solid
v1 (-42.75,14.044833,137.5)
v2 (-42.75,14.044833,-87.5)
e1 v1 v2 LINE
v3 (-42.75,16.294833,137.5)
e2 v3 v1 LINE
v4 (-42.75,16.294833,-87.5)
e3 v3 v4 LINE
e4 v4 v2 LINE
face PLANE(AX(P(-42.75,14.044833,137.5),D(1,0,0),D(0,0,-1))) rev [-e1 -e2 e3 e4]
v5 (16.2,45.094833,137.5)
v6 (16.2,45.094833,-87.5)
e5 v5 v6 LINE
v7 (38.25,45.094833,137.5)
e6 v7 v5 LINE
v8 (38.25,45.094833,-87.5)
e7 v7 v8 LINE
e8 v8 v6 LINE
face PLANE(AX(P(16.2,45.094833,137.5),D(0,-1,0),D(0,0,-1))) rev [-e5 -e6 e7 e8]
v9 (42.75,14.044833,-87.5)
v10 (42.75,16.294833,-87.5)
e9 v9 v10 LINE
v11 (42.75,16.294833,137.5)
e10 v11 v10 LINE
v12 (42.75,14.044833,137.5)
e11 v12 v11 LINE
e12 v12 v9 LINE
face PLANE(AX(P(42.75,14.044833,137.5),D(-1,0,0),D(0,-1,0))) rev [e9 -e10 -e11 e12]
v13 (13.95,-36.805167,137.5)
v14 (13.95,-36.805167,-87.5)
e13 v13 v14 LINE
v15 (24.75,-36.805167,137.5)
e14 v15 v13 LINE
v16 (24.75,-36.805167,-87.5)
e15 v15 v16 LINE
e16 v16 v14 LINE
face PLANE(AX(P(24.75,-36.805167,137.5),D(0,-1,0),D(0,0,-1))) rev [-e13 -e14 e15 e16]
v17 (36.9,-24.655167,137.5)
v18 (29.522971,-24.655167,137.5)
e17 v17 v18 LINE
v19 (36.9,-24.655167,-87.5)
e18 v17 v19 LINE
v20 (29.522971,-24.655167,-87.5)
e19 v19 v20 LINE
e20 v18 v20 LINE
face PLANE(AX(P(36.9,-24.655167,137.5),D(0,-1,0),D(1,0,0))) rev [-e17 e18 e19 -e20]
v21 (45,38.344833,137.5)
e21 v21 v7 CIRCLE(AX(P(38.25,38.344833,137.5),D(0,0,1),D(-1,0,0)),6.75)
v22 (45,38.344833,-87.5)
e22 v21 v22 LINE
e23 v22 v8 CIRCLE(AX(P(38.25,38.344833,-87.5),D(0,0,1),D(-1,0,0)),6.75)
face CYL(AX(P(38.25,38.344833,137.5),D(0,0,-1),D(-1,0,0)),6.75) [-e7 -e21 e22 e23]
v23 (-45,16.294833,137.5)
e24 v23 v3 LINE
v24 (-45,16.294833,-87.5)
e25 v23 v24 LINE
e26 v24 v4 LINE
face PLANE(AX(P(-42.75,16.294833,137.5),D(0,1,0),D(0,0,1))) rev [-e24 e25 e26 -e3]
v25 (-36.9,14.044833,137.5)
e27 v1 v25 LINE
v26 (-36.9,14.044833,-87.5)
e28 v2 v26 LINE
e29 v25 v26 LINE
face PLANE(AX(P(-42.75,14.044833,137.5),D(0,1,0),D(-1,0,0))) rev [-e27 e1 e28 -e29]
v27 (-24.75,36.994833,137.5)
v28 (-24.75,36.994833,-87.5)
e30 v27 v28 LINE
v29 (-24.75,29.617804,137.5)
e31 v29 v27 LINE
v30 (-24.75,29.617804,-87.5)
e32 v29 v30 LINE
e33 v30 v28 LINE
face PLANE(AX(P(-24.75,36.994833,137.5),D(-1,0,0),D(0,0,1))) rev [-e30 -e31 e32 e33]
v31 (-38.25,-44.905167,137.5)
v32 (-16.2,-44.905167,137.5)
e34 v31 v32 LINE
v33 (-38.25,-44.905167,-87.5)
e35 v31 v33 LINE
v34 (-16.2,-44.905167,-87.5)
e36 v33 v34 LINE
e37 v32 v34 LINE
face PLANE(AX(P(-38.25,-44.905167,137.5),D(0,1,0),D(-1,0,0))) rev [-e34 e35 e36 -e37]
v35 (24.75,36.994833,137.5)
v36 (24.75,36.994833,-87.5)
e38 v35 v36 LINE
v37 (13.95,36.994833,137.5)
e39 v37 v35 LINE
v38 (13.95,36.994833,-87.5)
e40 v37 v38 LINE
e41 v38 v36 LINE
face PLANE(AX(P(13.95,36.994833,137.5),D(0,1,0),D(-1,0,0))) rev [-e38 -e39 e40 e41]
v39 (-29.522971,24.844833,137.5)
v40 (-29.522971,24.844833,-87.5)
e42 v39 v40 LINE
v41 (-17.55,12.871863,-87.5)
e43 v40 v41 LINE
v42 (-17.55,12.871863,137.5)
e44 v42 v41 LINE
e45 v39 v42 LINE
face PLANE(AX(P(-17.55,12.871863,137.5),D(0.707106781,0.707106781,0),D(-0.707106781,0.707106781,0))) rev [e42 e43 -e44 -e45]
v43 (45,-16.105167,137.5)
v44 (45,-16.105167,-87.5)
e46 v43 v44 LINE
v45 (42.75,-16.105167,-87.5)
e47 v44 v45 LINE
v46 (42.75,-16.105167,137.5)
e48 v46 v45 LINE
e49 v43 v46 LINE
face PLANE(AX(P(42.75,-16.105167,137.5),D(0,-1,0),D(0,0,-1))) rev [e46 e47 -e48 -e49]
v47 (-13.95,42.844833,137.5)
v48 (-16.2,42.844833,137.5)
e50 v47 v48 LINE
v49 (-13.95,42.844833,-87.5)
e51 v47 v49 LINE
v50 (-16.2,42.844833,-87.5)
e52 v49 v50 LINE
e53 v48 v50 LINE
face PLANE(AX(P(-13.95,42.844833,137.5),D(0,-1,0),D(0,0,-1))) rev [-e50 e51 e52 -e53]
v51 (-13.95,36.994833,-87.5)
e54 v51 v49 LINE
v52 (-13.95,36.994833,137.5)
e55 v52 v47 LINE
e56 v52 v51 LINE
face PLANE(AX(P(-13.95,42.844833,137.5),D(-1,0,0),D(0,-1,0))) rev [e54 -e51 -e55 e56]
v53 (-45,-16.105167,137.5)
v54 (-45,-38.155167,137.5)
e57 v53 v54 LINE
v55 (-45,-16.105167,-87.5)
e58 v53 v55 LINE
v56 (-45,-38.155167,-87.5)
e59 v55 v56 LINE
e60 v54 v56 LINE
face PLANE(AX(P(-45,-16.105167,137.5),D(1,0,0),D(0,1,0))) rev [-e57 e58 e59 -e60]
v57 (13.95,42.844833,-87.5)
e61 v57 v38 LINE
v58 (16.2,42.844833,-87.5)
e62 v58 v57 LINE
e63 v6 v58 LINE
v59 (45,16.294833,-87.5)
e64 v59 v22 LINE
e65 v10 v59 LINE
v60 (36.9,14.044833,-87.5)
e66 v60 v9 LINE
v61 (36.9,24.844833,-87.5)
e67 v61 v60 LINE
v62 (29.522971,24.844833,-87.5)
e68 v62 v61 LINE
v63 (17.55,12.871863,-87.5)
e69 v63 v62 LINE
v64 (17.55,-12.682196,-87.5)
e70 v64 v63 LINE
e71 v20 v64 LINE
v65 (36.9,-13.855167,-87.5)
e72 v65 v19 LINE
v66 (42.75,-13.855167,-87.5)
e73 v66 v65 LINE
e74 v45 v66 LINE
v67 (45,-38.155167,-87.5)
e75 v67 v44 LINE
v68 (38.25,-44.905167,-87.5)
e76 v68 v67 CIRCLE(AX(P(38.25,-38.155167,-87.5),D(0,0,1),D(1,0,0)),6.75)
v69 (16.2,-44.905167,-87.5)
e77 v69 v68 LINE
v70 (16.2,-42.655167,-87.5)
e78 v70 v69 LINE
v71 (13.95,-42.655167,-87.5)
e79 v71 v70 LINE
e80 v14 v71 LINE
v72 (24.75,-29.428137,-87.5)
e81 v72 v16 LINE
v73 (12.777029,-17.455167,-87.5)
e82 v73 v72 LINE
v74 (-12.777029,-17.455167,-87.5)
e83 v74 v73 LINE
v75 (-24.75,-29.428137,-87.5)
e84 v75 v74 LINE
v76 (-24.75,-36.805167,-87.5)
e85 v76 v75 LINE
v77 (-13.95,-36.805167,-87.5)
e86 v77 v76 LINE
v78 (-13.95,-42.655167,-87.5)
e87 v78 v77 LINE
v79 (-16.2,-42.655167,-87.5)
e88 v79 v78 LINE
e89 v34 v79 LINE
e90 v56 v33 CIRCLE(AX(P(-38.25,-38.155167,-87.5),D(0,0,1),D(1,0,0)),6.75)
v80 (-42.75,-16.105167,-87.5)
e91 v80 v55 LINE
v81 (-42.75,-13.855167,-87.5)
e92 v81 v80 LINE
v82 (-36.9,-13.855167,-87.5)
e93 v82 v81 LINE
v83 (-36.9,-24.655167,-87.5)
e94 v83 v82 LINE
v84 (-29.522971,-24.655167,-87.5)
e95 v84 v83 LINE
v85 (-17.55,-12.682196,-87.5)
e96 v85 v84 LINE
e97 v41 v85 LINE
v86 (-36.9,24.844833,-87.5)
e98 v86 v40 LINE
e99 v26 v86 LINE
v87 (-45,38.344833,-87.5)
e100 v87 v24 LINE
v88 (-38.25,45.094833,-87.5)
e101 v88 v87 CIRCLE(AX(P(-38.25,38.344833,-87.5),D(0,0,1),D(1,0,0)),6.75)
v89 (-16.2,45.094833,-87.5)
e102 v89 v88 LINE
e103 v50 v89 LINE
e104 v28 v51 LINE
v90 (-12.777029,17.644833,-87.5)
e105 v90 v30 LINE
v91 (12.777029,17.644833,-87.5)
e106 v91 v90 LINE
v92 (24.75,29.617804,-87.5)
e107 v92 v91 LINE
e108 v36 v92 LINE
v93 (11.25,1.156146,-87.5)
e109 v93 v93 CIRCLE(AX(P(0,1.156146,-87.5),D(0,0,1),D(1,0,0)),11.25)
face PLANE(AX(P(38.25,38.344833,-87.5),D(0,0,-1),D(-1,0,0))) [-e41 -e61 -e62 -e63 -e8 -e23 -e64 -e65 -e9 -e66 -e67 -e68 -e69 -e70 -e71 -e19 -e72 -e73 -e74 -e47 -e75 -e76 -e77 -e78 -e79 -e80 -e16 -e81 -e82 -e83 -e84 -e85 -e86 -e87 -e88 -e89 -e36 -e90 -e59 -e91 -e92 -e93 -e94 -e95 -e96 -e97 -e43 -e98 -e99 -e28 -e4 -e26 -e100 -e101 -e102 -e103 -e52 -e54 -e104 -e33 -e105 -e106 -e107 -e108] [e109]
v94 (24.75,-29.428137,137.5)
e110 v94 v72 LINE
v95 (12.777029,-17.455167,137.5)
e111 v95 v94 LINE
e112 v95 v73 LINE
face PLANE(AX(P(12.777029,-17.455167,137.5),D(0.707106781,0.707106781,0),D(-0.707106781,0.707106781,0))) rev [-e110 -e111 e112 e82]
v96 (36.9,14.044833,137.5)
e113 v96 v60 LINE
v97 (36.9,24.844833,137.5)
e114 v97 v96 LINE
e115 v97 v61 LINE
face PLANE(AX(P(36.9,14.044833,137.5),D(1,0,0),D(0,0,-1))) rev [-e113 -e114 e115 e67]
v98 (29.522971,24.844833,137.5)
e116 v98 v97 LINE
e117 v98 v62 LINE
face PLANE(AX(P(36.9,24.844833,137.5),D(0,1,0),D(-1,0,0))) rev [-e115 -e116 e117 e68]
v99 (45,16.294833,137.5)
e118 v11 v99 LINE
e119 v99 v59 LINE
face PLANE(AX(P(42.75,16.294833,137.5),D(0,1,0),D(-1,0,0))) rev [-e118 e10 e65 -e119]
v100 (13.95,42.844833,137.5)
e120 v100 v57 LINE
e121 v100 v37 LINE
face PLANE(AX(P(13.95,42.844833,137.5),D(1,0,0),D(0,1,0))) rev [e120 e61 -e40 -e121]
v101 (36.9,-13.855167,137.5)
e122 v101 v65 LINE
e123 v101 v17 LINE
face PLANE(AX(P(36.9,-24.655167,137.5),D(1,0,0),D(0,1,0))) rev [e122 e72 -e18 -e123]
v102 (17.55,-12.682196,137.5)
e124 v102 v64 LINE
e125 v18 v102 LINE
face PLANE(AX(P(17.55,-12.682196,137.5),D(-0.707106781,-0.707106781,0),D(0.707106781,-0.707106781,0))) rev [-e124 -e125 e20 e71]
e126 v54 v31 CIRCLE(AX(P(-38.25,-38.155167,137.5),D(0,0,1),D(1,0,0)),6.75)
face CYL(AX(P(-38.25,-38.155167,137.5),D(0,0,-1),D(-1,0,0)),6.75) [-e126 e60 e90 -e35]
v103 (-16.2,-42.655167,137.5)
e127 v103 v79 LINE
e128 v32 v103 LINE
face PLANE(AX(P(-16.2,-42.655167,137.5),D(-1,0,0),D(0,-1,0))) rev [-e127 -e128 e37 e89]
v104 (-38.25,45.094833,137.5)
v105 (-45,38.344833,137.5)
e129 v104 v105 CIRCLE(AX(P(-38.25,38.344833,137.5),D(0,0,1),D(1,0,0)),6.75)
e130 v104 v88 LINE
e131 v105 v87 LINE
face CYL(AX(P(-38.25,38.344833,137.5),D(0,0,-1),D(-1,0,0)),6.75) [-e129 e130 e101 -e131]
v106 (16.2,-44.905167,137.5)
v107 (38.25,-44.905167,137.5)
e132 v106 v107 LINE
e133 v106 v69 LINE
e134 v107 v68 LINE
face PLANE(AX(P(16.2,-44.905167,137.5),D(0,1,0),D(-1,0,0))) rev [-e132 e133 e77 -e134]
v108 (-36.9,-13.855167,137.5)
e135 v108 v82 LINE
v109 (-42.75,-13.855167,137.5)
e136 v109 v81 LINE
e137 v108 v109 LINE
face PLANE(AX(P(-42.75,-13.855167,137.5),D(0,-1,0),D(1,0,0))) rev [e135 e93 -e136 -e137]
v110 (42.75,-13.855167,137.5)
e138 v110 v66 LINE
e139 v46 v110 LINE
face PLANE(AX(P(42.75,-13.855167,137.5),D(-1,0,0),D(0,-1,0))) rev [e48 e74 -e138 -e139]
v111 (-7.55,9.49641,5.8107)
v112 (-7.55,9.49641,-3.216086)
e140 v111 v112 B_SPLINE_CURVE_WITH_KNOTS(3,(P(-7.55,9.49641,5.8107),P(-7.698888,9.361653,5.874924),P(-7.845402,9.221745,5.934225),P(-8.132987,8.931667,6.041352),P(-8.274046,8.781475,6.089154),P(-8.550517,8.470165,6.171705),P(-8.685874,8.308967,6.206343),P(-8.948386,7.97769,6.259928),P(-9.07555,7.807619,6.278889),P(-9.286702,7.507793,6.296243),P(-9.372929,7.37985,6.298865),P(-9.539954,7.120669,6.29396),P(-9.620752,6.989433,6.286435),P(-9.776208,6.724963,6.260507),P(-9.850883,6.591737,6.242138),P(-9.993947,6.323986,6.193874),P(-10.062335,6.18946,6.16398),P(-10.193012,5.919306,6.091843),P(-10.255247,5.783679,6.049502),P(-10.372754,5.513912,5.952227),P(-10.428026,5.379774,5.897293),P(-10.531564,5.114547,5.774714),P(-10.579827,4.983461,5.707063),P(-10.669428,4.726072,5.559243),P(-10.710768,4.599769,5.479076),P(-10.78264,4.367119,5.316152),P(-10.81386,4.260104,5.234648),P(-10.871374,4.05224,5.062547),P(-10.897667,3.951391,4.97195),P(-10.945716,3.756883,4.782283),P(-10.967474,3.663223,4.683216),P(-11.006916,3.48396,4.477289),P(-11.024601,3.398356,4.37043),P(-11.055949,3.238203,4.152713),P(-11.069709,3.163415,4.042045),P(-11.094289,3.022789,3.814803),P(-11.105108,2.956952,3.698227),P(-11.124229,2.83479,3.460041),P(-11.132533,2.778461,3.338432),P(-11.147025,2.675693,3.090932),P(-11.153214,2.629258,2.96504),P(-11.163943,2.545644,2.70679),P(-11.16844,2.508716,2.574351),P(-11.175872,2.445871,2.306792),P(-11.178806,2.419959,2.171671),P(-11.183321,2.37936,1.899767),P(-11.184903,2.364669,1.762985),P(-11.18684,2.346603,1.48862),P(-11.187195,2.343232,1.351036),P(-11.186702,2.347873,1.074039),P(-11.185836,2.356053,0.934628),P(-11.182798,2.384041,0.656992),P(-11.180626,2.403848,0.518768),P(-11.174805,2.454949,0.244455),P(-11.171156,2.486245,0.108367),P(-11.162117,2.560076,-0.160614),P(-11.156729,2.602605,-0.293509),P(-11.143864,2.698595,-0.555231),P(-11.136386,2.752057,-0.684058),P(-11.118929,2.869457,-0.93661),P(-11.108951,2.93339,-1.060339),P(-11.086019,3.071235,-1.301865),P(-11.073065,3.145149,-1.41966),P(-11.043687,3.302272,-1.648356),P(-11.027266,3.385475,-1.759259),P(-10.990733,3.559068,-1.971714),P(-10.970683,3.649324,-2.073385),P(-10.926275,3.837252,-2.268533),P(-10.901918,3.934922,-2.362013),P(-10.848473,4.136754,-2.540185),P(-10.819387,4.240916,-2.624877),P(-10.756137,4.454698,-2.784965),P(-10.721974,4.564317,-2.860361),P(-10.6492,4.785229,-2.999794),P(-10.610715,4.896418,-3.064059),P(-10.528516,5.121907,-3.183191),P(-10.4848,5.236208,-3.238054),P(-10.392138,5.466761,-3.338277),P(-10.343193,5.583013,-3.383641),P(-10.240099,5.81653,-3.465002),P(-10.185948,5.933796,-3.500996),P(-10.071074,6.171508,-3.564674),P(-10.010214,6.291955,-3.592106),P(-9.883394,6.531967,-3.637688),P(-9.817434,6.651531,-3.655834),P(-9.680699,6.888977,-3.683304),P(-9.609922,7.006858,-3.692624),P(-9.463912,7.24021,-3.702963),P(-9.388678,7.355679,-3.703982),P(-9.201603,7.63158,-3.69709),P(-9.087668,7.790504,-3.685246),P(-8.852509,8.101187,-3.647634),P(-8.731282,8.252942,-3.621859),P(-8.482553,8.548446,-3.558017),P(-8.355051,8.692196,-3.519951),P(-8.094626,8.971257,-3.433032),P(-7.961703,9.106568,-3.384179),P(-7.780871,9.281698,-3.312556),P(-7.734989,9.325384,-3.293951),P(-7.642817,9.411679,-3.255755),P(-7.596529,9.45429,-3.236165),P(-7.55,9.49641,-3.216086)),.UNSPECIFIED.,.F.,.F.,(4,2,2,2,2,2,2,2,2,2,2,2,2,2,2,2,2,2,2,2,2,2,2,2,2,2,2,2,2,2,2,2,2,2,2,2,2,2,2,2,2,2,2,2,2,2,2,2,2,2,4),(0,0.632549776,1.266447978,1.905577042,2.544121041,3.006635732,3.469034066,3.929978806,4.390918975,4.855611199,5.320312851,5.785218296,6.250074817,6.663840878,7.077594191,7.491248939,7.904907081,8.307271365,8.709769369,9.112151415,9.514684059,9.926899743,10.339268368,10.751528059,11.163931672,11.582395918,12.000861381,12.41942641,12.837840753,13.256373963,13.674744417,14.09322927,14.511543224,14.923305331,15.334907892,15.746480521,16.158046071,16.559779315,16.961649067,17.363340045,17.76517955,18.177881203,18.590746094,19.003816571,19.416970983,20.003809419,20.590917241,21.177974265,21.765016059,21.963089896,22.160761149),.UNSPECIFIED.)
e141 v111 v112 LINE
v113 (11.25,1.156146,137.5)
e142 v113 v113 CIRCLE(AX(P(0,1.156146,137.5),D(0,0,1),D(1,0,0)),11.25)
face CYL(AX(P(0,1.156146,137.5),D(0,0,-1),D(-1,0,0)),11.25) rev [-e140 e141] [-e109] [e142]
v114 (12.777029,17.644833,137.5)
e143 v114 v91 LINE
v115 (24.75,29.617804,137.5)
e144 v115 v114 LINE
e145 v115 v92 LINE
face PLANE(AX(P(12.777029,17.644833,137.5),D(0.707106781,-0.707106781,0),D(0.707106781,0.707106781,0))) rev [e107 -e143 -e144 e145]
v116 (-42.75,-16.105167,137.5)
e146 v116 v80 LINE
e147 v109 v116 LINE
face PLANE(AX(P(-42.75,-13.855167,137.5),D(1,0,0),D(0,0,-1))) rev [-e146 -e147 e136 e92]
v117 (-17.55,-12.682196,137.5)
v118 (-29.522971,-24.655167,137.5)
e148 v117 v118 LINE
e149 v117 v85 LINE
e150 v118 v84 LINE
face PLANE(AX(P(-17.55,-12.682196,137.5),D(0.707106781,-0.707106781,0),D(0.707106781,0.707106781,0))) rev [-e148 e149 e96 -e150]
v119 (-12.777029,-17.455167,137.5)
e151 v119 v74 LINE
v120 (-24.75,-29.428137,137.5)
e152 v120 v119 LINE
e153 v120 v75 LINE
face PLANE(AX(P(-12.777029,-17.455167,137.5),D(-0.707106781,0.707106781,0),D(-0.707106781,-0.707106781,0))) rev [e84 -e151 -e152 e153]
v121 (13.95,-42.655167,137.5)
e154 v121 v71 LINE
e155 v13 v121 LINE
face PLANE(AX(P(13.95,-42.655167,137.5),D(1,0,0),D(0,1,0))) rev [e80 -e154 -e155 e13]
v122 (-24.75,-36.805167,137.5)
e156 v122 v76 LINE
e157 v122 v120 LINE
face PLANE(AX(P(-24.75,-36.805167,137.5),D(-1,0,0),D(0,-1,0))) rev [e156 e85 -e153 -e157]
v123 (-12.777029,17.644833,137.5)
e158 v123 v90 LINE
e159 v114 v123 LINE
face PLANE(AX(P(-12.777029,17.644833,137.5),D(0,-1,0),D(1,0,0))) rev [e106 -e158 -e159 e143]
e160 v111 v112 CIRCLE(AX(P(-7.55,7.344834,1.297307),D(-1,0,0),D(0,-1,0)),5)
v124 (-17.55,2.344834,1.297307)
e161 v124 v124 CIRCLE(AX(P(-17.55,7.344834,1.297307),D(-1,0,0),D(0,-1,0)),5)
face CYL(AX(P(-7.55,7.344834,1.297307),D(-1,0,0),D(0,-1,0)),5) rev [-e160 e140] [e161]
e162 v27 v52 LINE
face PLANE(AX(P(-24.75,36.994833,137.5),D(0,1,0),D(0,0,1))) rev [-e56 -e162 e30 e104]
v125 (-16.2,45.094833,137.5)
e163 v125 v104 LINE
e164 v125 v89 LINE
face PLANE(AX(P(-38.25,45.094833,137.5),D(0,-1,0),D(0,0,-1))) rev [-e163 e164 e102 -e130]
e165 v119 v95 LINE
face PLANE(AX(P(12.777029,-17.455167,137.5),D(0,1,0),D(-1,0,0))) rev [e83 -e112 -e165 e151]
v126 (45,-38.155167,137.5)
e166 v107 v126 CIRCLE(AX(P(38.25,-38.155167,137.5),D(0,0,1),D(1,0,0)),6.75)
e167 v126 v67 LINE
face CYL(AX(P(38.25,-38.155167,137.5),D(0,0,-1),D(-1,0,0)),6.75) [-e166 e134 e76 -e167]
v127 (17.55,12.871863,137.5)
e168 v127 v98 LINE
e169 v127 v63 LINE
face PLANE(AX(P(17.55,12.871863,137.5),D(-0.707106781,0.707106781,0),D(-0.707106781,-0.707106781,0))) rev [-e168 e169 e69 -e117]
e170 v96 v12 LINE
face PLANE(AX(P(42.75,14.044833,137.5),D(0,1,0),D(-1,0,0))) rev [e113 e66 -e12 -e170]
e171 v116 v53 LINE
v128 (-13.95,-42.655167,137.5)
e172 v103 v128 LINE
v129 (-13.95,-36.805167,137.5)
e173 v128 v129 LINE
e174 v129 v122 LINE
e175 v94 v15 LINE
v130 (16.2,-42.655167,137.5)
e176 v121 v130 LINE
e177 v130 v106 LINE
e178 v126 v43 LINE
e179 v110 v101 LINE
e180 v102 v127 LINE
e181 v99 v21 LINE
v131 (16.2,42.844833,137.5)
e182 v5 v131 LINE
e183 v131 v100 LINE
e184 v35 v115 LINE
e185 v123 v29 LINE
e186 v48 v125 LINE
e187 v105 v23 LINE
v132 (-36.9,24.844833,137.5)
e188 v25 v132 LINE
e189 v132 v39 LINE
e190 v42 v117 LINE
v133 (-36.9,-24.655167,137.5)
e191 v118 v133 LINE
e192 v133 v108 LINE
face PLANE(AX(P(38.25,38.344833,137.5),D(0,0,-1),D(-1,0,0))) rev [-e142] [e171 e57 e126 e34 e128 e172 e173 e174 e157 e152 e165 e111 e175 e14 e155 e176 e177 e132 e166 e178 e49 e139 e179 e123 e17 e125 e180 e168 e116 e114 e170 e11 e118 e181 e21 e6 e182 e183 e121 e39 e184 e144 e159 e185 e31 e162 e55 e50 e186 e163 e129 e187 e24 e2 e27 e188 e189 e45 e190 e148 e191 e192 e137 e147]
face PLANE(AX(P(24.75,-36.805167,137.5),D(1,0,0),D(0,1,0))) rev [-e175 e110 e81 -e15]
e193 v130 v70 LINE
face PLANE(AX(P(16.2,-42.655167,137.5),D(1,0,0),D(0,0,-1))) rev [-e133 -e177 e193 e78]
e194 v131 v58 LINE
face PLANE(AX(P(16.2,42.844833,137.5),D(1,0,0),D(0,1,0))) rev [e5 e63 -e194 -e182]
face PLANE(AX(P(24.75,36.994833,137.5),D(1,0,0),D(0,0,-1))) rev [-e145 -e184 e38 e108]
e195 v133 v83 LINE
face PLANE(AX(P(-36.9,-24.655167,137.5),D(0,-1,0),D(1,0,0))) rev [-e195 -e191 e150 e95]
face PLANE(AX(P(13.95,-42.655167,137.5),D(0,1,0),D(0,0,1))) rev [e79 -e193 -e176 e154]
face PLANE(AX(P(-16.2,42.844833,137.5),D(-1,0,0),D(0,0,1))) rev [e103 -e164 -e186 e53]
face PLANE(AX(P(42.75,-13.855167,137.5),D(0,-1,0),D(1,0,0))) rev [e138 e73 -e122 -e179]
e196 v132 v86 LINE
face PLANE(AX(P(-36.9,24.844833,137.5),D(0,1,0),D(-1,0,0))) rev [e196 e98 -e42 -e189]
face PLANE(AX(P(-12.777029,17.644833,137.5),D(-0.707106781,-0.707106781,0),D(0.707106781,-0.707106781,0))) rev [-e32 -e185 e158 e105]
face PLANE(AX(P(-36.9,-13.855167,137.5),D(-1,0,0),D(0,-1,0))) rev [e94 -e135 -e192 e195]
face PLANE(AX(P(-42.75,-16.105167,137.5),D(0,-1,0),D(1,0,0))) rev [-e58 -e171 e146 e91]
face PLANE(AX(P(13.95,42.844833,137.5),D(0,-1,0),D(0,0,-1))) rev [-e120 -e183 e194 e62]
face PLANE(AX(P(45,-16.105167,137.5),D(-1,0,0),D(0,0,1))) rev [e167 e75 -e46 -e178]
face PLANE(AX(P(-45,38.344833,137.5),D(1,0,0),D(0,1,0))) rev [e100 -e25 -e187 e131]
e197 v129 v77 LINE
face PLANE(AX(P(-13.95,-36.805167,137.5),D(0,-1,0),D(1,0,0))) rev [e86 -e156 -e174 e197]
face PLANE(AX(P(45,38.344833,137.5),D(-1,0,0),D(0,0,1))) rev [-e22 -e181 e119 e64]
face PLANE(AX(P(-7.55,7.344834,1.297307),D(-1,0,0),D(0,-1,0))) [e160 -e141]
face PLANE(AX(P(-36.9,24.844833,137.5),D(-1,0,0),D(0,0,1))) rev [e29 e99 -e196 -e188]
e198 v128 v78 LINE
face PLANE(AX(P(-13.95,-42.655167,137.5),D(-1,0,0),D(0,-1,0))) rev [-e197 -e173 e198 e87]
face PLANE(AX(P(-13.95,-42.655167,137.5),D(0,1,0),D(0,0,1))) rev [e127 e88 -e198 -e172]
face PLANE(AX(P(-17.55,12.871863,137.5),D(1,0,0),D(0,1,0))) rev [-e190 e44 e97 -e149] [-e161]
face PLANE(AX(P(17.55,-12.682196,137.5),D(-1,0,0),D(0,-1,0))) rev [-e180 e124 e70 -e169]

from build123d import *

# Parameters (mm, degrees)
SKETCH1_R           = 2.5
BOSS_EXTRUDE1_DEPTH = 50
SCALE_2_SCALE       = 3
SCALE_3_SCALE       = 6
SCALE_5_SCALE       = 2
SCALE_6_SCALE       = 0.25
SCALE_7_SCALE       = 0.125
SCALE_8_SCALE       = 0.25
SCALE_9_SCALE       = 4
SCALE_10_SCALE      = 4
OTHER_START         = -17.55
OTHER_1_OUTLINE_R   = 5
OTHER_1_DEPTH       = 10


# Read off the part's stored shape, not the designer's step: 孔1
with BuildPart() as part:
    # Sketch1 → Boss-Extrude1 (new body)
    with BuildSketch(Plane.XY):
        with BuildLine():
            Line((2.839339828, 3.9), (5.5, 6.560660172))
            Line((5.5, 6.560660172), (5.5, 8.2))
            Line((5.5, 8.2), (3.1, 8.2))
            Line((3.1, 8.2), (3.1, 9.5))
            Line((3.1, 9.5), (3.6, 9.5))
            Line((3.6, 9.5), (3.6, 10))
            Line((3.6, 10), (8.5, 10))
            ThreePointArc((8.5, 10), (9.560660172, 9.560660172), (10, 8.5))
            Line((10, 8.5), (10, 3.6))
            Line((10, 3.6), (9.5, 3.6))
            Line((9.5, 3.6), (9.5, 3.1))
            Line((9.5, 3.1), (8.2, 3.1))
            Line((8.2, 3.1), (8.2, 5.5))
            Line((8.2, 5.5), (6.560660172, 5.5))
            Line((6.560660172, 5.5), (3.9, 2.839339828))
            Line((3.9, 2.839339828), (3.9, -2.839339828))
            Line((3.9, -2.839339828), (6.560660172, -5.5))
            Line((6.560660172, -5.5), (8.2, -5.5))
            Line((8.2, -5.5), (8.2, -3.1))
            Line((8.2, -3.1), (9.5, -3.1))
            Line((9.5, -3.1), (9.5, -3.6))
            Line((9.5, -3.6), (10, -3.6))
            Line((10, -3.6), (10, -8.5))
            ThreePointArc((10, -8.5), (9.560660172, -9.560660172), (8.5, -10))
            Line((8.5, -10), (3.6, -10))
            Line((3.6, -10), (3.6, -9.5))
            Line((3.6, -9.5), (3.1, -9.5))
            Line((3.1, -9.5), (3.1, -8.2))
            Line((3.1, -8.2), (5.5, -8.2))
            Line((5.5, -8.2), (5.5, -6.560660172))
            Line((5.5, -6.560660172), (2.839339828, -3.9))
            Line((2.839339828, -3.9), (-2.839339828, -3.9))
            Line((-2.839339828, -3.9), (-5.5, -6.560660172))
            Line((-5.5, -6.560660172), (-5.5, -8.2))
            Line((-5.5, -8.2), (-3.1, -8.2))
            Line((-3.1, -8.2), (-3.1, -9.5))
            Line((-3.1, -9.5), (-3.6, -9.5))
            Line((-3.6, -9.5), (-3.6, -10))
            Line((-3.6, -10), (-8.5, -10))
            ThreePointArc((-8.5, -10), (-9.560660172, -9.560660172), (-10, -8.5))
            Line((-10, -8.5), (-10, -3.6))
            Line((-10, -3.6), (-9.5, -3.6))
            Line((-9.5, -3.6), (-9.5, -3.1))
            Line((-9.5, -3.1), (-8.2, -3.1))
            Line((-8.2, -3.1), (-8.2, -5.5))
            Line((-8.2, -5.5), (-6.560660172, -5.5))
            Line((-6.560660172, -5.5), (-3.9, -2.839339828))
            Line((-3.9, -2.839339828), (-3.9, 2.839339828))
            Line((-3.9, 2.839339828), (-6.560660172, 5.5))
            Line((-6.560660172, 5.5), (-8.2, 5.5))
            Line((-8.2, 5.5), (-8.2, 3.1))
            Line((-8.2, 3.1), (-9.5, 3.1))
            Line((-9.5, 3.1), (-9.5, 3.6))
            Line((-9.5, 3.6), (-10, 3.6))
            Line((-10, 3.6), (-10, 8.5))
            ThreePointArc((-10, 8.5), (-9.560660172, 9.560660172), (-8.5, 10))
            Line((-8.5, 10), (-3.6, 10))
            Line((-3.6, 10), (-3.6, 9.5))
            Line((-3.6, 9.5), (-3.1, 9.5))
            Line((-3.1, 9.5), (-3.1, 8.2))
            Line((-3.1, 8.2), (-5.5, 8.2))
            Line((-5.5, 8.2), (-5.5, 6.560660172))
            Line((-5.5, 6.560660172), (-2.839339828, 3.9))
            Line((-2.839339828, 3.9), (2.839339828, 3.9))
        make_face()
        with Locations((0, 0.235847297)):
            Circle(SKETCH1_R, mode=Mode.SUBTRACT)
    extrude(amount=BOSS_EXTRUDE1_DEPTH)


with BuildPart() as part_1:
    # 缩放比例2: scaled about (0, -0.027095247, 25)
    add(part.part.scale(SCALE_2_SCALE).moved(Location((0, 0.054190494, -50))))


with BuildPart() as part_2:
    # 缩放比例3: scaled about (0, -0.027095247, 25)
    add(part_1.part.scale(SCALE_3_SCALE).moved(Location((0, 0.135476235, -125))))


with BuildPart() as part_3:
    # 缩放比例5: scaled about (0, -0.027095249, 25)
    add(part_2.part.scale(SCALE_5_SCALE).moved(Location((0, 0.027095249, -25))))


with BuildPart() as part_4:
    # 缩放比例6: scaled about (0, -0.027095249, 25)
    add(part_3.part.scale(SCALE_6_SCALE).moved(Location((0, -0.020321437, 18.75))))


with BuildPart() as part_5:
    # 缩放比例7: scaled about (0, -0.027095249, 25)
    add(part_4.part.scale(SCALE_7_SCALE).moved(Location((0, -0.023708343, 21.875))))


with BuildPart() as part_6:
    # 缩放比例8: scaled about (0, -0.027095249, 25)
    add(part_5.part.scale(SCALE_8_SCALE).moved(Location((0, -0.020321437, 18.75))))


with BuildPart() as part_7:
    # 缩放比例9: scaled about (0, -0.027095249, 25)
    add(part_6.part.scale(SCALE_9_SCALE).moved(Location((0, 0.081285747, -75))))


with BuildPart() as part_8:
    # 缩放比例10: scaled about (0, -0.027095249, 25)
    add(part_7.part.scale(SCALE_10_SCALE).moved(Location((0, 0.081285747, -75))))

    # 孔1 outline → 孔1 (cut)
    with BuildSketch(Plane.YZ.offset(OTHER_START)):
        with Locations((7.344833538, 1.297306883)):
            Circle(OTHER_1_OUTLINE_R)
    extrude(amount=OTHER_1_DEPTH, mode=Mode.SUBTRACT)


solid = part_8.part
